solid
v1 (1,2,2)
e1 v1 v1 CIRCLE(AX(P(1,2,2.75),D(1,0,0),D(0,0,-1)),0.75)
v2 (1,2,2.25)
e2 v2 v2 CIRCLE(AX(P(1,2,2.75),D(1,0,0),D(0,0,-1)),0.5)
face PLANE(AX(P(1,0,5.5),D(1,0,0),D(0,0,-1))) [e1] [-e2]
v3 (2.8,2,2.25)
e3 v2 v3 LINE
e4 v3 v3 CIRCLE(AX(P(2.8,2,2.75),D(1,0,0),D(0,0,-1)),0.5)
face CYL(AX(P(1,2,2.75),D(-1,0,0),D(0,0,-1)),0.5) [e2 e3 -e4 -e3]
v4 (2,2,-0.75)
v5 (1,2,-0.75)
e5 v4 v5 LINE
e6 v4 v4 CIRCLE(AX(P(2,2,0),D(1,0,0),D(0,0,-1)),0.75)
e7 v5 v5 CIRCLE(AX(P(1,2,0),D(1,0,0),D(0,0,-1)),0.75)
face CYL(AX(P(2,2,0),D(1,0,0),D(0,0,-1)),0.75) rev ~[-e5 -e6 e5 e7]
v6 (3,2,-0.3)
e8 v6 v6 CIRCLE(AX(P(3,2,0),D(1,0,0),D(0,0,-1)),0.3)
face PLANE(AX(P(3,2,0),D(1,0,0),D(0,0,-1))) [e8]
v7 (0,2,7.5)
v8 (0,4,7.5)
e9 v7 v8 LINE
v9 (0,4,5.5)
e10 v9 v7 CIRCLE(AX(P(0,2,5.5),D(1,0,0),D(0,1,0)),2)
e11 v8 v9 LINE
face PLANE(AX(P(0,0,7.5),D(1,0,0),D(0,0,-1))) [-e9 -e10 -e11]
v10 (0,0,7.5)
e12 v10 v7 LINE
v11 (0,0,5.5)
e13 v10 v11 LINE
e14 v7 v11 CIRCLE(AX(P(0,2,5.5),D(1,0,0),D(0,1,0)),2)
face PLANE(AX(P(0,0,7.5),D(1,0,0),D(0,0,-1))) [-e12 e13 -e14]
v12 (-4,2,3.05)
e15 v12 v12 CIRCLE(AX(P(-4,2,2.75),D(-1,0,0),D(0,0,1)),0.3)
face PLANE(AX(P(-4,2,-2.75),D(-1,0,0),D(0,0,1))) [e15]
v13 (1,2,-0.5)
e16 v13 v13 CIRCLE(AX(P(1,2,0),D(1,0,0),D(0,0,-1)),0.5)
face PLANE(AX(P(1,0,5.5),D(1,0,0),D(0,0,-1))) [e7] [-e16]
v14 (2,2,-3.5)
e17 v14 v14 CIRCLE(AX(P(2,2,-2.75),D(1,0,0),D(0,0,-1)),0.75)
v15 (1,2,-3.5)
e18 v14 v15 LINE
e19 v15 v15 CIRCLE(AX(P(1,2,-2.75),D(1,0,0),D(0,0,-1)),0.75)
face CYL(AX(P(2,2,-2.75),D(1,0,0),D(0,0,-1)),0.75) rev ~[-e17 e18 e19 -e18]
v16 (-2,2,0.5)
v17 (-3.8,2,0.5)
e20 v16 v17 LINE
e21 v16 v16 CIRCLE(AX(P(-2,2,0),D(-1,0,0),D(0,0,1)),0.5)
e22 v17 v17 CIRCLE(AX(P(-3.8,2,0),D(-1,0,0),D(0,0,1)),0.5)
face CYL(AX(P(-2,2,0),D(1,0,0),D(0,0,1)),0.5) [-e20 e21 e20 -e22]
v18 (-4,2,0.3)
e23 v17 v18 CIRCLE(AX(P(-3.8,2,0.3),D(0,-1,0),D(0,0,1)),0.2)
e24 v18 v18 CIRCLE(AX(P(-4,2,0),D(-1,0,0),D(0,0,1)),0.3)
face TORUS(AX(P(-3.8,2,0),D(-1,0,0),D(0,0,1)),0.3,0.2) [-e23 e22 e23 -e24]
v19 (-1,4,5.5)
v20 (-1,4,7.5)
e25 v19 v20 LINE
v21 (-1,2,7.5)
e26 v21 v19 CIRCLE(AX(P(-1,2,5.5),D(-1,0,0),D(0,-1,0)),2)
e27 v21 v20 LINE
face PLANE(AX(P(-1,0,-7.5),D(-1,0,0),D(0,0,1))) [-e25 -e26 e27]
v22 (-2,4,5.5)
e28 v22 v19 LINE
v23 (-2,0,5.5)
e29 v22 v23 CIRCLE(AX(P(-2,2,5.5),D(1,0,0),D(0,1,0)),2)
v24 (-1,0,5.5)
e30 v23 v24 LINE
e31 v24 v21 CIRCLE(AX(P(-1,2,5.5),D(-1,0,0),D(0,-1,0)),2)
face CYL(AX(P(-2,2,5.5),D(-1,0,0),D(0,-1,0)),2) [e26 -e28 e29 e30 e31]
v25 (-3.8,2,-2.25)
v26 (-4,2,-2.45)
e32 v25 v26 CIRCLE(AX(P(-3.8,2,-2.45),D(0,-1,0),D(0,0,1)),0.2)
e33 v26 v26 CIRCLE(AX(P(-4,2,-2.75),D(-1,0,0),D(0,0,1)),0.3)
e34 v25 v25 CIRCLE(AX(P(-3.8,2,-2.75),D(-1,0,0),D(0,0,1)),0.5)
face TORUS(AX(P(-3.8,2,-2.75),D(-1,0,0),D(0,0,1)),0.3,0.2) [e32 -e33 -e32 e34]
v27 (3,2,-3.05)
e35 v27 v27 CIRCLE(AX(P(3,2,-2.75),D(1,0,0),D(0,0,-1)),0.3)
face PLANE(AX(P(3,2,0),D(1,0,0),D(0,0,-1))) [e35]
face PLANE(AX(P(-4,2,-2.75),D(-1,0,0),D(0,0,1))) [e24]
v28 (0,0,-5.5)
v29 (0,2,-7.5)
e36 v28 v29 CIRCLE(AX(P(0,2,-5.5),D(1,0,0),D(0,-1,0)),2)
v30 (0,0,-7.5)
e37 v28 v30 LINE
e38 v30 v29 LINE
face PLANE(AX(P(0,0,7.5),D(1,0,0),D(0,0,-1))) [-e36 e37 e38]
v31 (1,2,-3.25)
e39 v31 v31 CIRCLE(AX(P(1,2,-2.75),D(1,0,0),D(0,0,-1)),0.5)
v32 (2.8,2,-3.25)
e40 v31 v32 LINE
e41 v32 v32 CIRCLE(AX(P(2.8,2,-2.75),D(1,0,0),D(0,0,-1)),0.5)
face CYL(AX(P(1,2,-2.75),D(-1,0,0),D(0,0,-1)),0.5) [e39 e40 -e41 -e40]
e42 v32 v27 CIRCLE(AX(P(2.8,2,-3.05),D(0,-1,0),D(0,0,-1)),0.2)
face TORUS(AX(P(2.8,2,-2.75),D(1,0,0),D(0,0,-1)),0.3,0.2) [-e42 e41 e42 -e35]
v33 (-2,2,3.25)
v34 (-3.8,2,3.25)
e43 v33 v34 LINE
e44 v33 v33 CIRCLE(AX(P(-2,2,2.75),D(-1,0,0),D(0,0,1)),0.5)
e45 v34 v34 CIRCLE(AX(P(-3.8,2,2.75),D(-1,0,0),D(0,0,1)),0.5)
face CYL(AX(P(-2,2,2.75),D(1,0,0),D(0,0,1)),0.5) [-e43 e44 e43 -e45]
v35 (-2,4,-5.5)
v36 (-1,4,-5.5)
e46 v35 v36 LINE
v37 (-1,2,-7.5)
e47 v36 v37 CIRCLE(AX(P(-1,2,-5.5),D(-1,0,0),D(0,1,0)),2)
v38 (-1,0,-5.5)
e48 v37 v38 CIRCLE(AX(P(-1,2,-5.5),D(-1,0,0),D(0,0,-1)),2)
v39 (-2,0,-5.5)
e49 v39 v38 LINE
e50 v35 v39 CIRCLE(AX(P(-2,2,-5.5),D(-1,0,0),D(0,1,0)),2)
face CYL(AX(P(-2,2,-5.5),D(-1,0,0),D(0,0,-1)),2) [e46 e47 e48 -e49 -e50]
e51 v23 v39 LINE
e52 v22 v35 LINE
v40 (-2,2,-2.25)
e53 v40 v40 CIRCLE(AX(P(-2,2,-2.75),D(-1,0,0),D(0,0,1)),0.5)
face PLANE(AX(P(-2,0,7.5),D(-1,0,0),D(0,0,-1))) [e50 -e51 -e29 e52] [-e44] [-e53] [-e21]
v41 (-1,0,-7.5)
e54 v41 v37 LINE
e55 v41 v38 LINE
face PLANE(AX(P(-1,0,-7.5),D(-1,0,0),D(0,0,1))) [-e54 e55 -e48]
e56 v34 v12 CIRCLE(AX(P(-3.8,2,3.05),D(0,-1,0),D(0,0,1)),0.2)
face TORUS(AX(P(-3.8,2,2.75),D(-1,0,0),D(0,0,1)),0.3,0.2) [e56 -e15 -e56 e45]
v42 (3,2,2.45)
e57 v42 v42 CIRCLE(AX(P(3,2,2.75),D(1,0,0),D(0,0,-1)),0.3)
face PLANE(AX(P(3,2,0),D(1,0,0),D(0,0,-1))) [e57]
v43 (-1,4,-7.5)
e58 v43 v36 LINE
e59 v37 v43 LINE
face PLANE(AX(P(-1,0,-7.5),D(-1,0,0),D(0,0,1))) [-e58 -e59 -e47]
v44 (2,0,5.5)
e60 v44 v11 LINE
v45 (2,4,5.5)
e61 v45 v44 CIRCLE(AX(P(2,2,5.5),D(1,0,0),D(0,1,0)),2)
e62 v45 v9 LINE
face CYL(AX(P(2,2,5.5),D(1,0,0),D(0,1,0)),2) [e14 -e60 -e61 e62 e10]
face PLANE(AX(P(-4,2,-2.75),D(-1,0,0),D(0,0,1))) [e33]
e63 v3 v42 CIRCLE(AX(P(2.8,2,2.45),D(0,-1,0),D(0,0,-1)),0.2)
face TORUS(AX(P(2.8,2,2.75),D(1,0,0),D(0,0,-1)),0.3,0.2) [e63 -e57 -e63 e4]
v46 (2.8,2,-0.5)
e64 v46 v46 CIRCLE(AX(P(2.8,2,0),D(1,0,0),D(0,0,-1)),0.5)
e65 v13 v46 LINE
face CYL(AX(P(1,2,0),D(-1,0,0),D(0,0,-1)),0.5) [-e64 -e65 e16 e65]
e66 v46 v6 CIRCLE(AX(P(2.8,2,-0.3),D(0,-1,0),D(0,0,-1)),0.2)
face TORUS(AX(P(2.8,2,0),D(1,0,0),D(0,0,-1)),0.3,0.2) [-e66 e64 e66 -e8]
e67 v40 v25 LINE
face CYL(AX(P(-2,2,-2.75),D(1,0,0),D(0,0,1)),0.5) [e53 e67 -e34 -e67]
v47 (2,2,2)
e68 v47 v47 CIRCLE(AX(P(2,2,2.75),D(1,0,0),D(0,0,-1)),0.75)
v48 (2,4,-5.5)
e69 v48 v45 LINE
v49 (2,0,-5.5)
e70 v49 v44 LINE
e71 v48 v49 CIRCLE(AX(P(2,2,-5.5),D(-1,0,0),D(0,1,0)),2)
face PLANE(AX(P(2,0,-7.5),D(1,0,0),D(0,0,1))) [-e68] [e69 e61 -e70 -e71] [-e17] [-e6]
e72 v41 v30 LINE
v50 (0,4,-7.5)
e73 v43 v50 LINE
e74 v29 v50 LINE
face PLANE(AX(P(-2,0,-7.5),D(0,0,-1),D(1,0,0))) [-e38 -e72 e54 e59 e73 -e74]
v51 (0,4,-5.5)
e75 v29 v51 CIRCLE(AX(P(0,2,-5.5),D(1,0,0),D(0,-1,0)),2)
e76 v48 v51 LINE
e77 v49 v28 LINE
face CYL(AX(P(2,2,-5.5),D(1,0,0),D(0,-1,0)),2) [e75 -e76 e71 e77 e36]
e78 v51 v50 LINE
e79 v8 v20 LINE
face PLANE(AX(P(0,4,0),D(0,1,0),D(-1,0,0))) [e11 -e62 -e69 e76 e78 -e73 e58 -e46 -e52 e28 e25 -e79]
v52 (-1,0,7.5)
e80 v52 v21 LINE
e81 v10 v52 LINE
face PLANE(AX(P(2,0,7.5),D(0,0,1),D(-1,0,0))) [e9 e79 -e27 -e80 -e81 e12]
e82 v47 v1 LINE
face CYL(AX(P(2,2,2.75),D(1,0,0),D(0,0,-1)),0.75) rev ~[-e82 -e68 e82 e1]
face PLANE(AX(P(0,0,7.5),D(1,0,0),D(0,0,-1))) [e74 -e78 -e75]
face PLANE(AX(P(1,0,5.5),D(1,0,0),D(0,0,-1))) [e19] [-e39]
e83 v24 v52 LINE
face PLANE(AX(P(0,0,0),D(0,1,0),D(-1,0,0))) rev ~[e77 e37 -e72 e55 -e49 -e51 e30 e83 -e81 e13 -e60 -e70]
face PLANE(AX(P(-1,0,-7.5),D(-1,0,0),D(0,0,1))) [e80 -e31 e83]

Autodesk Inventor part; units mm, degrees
ref_plane "YZ Plane" through (0, 0, 0) normal (1, 0, 0) x (0, 1, 0)
ref_plane "XZ Plane" through (0, 0, 0) normal (0, 1, 0) x (-1, 0, 0)
ref_plane "XY Plane" through (0, 0, 0) normal (0, 0, 1) x (1, 0, 0)
sketch "Sketch1" plane through (0, 0, 0) normal (0, 1, 0) x (-1, 0, 0)
  line L0 (-2, 7.5) -> (2, 7.5)
  line L1 (2, 7.5) -> (2, -7.5)
  line L2 (2, -7.5) -> (-2, -7.5)
  line L3 (-2, -7.5) -> (-2, 7.5)
  line L4 (-2, 7.5) -> (2, -7.5) construction
  line L5 (2, 7.5) -> (-2, -7.5) construction
  point P0 (0, 0)
  dimension "d0" = 4
  dimension "d1" = 15
extrude "Extrusion1" add sketch "Sketch1" along normal blind 4
sketch "Sketch2" plane through (2, 0, 7.5) normal (1, 0, 0) x (0, 0, -1)
  line L0 (0, 0) -> (0, 4) projected
  line L1 (0, 2) -> (15, 2) construction
  line L2 (15, 0) -> (15, 4) projected
  line L3 (2, 0) -> (13, 0)
  line L4 (13, 4) -> (2, 4)
  arc A0 (2, 4) -> (2, 0) centre (2, 2) ccw
  arc A1 (13, 0) -> (13, 4) centre (13, 2) ccw
  line L5 (0, 4) -> (15, 4) projected
  line L6 (0, 0) -> (15, 0) projected
  point P0 (7.5, 0)
  point P1 (7.5, 2)
  point P2 (15, 2)
extrude "Extrusion2" cut sketch "Sketch2" against normal blind 2 contours L0 A0 L6 | L0 L5 A0 | A1 L2 L6 | L5 L2 A1
sketch "Sketch3" plane through (-2, 0, -7.5) normal (-1, 0, 0) x (0, 0, 1)
  arc A0 (2, 4) -> (0, 2) centre (2, 2) ccw projected
  line L0 (0, 0) -> (0, 4) projected
  line L1 (0, 4) -> (15, 4) projected
  arc A1 (0, 2) -> (2, 0) centre (2, 2) ccw projected
  arc A2 (2, 4) -> (2, 0) centre (2, 2) ccw projected
  line L2 (13, 4) -> (2, 4) projected
  arc A3 (13, 0) -> (13, 4) centre (13, 2) ccw projected
  line L3 (13, 0) -> (2, 0) projected
  line L4 (15, 0) -> (15, 4) projected
  line L5 (0, 0) -> (15, 0) projected
  point P0 (7.5, 0)
  point P1 (15, 2)
extrude "Extrusion3" cut sketch "Sketch3" against normal blind 1 contours A0 L0 L1 | A1 L5 L0 | L1 L4 A3 | L4 L5 A3
sketch "Sketch4" plane through (-2, 0, -5.5) normal (-1, 0, 0) x (0, 0, 1)
  arc A0 (0, 4) -> (-2, 2) centre (0, 2) ccw projected
  circle A1 centre (0, 2) radius 1.5
  arc A2 (13, 2) -> (11, 4) centre (11, 2) ccw projected
  circle A3 centre (11, 2) radius 1.5
  point P0 (5.5, 0)
  dimension "d8" = 3
  dimension "d9" = 3
mark "Mark1"
sketch "Sketch5" plane through (-2, 0, -5.5) normal (-1, 0, 0) x (0, 0, 1)
  circle A0 centre (2.75, 2) radius 1
  circle A1 centre (0, 2) radius 1.5 projected
  circle A2 centre (11, 2) radius 1.5 projected
  line L0 (0, 4) -> (11, 4) projected
  circle A3 centre (5.5, 2) radius 1
  circle A4 centre (8.25, 2) radius 1
  point P0 (5.5, 0)
  dimension "d10" = 2
  dimension "d11" = 2.75
  dimension "d12" = 11
  dimension "d15" = 2.75
mark "Mark2"
sketch "Sketch6" plane through (-2, 2, -2.75) normal (-1, 0, 0) x (0, 0, 1)
  circle A0 centre (0, 0) radius 1 projected
  circle A1 centre (0, 0) radius 0.5
  circle A2 centre (2.75, 0) radius 1 projected
  circle A3 centre (2.75, 0) radius 0.5
  circle A4 centre (5.5, 0) radius 1 projected
  circle A5 centre (5.5, 0) radius 0.5
  point P0 (2.75, -2)
  dimension "d20" = 1
  dimension "d21" = 1
  dimension "d31" = 1
extrude "Extrusion4" add sketch "Sketch6" along normal blind 2 contours A1 | A3 | A5
sketch "Sketch7" plane through (2, 0, 5.5) normal (1, 0, 0) x (0, 0, -1)
  circle A0 centre (0, 2) radius 1.5 projected
  circle A1 centre (11, 2) radius 1.5 projected
  point P0 (5.5, 0)
mark "Mark3"
sketch "Sketch8" plane through (2, 0, 5.5) normal (1, 0, 0) x (0, 0, -1)
  circle A0 centre (8.25, 2) radius 1 projected
  circle A1 centre (5.5, 2) radius 1 projected
  circle A2 centre (5.5, 2) radius 0.75
  circle A3 centre (8.25, 2) radius 0.75
  circle A4 centre (2.75, 2) radius 1 projected
  circle A5 centre (2.75, 2) radius 0.75
  point P0 (5.5, 0)
  dimension "d24" = 1.5
  dimension "d25" = 1.5
  dimension "d32" = 1.5
extrude "Extrusion5" cut sketch "Sketch8" against normal blind 1 contours A2 | A3 | A5
sketch "Sketch9" plane through (1, 2, 0) normal (1, 0, 0) x (0, 0, -1)
  circle A0 centre (2.75, 0) radius 0.5 projected
  circle A1 centre (0, 0) radius 0.5 projected
  circle A2 centre (-2.75, 0) radius 0.5 projected
  point P0 (0, -2)
extrude "Extrusion6" add sketch "Sketch9" along normal blind 2
fillet "Fillet1" radius 0.2 6 edges at (3, 2, 0.5) (3, 2, -2.25) (-4, 2, -3.25) (-4, 2, -0.5) (3, 2, 3.25) (-4, 2, 2.25)
equation "\"d9\" = d8"
equation "\"d11\" = 0.25 * d12"
equation "\"d15\" = d11"
equation "\"d21\" = d20"
equation "\"d31\" = d21"
equation "\"d25\" = d24"
equation "\"d32\" = d24"
properties part number "3_pin_no_ear_male"
